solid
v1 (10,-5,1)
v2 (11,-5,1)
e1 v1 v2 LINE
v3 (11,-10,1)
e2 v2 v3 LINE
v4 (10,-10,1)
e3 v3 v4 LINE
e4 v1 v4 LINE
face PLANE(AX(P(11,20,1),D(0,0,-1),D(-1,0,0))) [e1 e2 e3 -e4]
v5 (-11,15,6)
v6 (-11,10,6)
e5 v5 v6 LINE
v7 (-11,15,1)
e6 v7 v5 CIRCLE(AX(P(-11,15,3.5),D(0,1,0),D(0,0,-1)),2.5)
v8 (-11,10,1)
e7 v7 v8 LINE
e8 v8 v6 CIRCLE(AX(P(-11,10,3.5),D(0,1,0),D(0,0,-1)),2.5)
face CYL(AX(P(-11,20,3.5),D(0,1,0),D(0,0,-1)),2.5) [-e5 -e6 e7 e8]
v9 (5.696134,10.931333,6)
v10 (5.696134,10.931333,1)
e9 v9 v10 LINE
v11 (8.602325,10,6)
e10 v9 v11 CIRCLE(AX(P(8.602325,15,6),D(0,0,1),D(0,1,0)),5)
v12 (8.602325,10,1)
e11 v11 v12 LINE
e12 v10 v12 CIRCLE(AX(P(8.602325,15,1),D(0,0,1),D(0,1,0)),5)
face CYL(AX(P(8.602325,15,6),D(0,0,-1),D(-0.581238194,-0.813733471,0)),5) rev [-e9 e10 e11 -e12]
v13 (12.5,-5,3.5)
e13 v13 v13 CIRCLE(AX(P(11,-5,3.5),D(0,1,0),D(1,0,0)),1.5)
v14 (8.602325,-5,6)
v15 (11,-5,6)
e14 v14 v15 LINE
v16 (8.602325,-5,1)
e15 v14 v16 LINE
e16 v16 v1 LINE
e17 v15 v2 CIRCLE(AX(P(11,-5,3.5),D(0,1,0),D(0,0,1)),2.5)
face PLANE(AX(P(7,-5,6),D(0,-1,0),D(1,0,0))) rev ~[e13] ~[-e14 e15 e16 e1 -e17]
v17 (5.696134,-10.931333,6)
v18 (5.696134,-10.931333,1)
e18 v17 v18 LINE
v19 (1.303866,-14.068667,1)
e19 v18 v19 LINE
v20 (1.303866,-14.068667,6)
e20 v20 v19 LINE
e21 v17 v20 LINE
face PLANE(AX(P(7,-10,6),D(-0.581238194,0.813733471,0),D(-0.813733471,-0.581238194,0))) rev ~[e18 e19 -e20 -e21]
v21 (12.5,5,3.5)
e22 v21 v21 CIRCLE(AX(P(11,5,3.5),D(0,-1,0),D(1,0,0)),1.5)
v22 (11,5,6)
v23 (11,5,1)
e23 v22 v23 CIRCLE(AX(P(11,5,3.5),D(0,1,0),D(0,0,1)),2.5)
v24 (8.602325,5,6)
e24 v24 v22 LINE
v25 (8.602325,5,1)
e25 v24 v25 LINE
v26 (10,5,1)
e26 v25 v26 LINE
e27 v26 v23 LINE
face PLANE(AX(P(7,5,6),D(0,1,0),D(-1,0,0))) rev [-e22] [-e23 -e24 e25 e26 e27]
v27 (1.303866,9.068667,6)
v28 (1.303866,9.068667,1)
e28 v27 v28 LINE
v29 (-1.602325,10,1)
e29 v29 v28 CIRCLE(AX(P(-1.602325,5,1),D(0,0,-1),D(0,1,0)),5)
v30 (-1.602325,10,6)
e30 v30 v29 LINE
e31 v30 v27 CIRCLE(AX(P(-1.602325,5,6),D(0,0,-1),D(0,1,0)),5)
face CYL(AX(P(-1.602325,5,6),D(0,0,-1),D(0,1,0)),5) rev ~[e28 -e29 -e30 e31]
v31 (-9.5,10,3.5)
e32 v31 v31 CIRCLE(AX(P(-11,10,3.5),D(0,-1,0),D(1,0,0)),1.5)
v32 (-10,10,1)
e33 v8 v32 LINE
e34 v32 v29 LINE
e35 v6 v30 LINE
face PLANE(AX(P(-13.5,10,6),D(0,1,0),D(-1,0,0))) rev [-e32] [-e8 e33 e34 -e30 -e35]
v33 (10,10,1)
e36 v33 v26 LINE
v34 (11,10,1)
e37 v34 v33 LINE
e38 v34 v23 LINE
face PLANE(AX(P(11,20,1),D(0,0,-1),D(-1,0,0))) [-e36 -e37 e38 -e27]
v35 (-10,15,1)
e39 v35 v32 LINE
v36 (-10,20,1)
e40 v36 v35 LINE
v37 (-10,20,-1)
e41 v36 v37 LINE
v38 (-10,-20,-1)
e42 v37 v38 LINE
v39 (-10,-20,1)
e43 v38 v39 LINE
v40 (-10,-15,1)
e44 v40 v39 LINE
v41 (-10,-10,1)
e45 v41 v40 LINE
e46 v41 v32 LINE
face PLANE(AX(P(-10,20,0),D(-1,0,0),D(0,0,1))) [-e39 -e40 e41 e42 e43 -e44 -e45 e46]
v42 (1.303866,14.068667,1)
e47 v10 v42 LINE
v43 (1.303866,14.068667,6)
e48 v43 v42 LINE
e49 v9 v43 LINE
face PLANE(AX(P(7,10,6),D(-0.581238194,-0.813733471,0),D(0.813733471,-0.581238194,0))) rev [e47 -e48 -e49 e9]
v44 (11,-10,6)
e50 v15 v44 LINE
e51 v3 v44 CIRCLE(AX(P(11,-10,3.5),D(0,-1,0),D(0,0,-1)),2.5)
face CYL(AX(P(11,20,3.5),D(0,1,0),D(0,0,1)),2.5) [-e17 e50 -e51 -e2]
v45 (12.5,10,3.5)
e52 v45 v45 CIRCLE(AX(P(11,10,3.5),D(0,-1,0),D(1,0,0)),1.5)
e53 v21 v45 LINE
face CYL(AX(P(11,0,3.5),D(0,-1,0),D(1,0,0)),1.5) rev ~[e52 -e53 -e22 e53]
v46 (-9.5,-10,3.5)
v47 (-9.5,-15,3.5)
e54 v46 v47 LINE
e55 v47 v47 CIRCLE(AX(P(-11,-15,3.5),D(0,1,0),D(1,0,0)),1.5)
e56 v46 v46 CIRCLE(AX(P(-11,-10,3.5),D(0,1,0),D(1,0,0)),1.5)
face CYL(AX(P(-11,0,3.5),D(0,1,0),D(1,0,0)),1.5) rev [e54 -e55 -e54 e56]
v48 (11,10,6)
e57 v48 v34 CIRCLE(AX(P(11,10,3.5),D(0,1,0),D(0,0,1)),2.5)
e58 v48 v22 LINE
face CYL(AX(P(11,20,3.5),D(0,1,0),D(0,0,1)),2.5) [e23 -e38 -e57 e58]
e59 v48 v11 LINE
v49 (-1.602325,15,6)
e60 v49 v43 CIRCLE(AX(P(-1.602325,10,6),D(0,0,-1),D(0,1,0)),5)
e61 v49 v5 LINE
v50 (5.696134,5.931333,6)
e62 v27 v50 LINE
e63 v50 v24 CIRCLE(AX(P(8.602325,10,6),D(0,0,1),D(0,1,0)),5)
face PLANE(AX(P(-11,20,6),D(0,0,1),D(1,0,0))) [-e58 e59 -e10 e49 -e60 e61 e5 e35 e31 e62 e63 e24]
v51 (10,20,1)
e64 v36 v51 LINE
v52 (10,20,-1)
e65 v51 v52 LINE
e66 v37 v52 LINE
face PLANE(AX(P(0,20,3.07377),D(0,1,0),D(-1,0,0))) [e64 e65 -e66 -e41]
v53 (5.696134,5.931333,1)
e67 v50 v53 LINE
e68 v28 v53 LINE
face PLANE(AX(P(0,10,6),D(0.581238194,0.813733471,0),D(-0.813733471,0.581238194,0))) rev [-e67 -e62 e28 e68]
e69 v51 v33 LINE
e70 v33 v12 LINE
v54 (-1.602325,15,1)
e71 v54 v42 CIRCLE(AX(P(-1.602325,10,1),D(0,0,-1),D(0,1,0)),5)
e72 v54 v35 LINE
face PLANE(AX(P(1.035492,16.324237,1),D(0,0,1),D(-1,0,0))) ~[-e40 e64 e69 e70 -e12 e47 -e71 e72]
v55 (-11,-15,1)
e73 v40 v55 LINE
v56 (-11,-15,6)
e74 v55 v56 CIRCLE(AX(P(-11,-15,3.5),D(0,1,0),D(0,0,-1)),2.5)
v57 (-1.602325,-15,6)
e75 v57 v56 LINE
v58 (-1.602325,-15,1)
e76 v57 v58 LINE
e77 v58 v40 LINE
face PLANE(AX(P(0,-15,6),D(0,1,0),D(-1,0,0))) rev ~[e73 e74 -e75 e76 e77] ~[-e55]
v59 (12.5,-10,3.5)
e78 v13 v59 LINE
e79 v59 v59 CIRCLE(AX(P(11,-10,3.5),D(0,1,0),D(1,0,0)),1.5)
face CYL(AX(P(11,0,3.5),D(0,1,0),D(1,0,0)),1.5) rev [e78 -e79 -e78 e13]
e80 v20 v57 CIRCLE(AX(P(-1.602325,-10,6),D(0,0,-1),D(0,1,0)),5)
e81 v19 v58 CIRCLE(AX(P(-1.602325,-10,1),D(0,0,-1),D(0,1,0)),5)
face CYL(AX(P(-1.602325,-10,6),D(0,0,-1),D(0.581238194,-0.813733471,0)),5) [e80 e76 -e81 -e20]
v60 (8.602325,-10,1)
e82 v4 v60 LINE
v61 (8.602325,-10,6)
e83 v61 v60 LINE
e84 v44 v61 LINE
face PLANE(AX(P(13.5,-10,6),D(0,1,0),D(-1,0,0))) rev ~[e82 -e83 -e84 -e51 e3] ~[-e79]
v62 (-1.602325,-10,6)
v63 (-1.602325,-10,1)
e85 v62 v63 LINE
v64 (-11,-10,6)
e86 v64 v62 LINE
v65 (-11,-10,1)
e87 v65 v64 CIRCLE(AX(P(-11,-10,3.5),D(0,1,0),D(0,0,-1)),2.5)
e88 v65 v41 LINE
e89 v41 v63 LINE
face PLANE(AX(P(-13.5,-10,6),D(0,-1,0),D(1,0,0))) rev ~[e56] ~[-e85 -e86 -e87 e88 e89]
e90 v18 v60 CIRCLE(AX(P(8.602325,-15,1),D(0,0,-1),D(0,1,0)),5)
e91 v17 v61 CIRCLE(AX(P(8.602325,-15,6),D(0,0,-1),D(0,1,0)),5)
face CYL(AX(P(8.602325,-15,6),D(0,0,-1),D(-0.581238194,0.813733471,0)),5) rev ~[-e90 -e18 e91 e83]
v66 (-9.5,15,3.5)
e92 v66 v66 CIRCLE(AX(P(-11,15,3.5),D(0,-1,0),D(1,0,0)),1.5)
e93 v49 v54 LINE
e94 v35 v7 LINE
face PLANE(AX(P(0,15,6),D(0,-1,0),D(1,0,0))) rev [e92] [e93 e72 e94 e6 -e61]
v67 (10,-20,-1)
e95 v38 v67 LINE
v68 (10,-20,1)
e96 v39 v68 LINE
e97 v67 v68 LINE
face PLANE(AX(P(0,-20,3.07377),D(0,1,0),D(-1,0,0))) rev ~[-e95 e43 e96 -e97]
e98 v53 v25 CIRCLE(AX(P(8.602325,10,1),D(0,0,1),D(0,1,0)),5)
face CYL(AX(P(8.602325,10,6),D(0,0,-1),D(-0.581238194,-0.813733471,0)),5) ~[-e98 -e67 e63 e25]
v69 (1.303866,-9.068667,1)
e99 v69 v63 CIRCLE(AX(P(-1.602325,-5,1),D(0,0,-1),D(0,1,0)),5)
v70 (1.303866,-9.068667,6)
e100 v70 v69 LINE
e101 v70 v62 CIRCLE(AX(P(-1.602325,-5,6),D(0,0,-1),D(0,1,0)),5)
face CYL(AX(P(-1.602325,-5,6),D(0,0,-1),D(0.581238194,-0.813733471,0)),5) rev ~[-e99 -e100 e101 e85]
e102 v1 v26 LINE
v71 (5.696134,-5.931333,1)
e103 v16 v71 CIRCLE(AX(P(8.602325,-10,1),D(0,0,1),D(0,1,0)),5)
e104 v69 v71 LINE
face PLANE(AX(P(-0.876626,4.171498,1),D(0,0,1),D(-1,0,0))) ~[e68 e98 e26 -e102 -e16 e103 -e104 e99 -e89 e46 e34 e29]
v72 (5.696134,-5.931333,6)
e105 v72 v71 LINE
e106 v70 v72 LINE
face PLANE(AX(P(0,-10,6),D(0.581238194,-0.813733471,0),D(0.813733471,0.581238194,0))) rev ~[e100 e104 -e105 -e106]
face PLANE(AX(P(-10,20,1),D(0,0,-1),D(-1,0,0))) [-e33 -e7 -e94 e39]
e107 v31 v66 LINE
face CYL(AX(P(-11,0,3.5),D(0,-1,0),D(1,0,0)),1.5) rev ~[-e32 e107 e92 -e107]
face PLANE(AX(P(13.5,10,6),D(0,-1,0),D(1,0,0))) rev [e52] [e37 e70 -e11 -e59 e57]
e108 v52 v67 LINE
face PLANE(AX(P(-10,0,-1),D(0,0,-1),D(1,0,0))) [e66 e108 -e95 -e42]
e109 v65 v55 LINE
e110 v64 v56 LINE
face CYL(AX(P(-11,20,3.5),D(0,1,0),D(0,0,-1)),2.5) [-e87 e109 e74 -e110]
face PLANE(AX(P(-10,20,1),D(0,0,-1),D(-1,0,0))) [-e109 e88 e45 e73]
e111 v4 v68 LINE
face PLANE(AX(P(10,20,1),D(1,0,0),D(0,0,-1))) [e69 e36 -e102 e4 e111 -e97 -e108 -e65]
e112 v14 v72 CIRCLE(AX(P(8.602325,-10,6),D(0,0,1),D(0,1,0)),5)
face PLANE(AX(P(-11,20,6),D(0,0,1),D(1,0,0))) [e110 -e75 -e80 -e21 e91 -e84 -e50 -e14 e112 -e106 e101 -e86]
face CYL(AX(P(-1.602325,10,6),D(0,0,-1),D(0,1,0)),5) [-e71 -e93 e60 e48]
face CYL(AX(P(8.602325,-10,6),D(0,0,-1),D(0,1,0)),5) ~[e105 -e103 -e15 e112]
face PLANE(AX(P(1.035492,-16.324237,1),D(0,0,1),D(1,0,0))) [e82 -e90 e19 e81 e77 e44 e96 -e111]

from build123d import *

# Parameters (mm, degrees)
F0_W          = 20
F0_H          = 1
F1_DEPTH      = 20
F1_DEPTH_BACK = 20
F3_DEPTH      = 40
F5_DEPTH      = 5
F7_R          = 1.5
F8_DEPTH      = 20.001
F8_DEPTH_BACK = 20.001
F9_R          = 5


# Not quite as in the source:
# - a pattern or mirror of a feature is missing from the dataset's text; its kind, count and spacing are read off the source's solid


with BuildPart() as f1:
    # F0 (on Front) → F1 (new body, two sides)
    with BuildSketch(Plane.XZ) as f1_sk:
        with Locations((0, -0.5)):
            Rectangle(F0_W, F0_H)
    extrude(amount=F1_DEPTH)
    extrude(f1_sk.sketch, amount=-F1_DEPTH_BACK)

    # F2 (on face) → F3 (join, through all)
    with BuildSketch(Plane(origin=(0, 20, 0), x_dir=(-1, 0, 0), z_dir=(0, 1, 0))):
        with BuildLine():
            Line((10, 1), (11, 1))
            ThreePointArc((11, 1), (13.5, 3.5), (11, 6))
            Line((11, 6), (0, 6))
            Line((0, 6), (-11, 6))
            ThreePointArc((-11, 6), (-13.5, 3.5), (-11, 1))
            Line((-11, 1), (-10, 1))
            Line((-10, 1), (-10, 0))
            Line((-10, 0), (0, 0))
            Line((0, 0), (10, 0))
            Line((10, 0), (10, 1))
        make_face()
    extrude(amount=-F3_DEPTH)

    # F4 (on face) → F5 (cut, through all)
    with BuildSketch(Plane.XY.offset(6)):
        Polygon((0, -15), (-13.5, -15), (-13.5, -20), (13.5, -20), (13.5, -10), (7, -10), align=None)
        Polygon((-13.5, 0), (-13.5, -10), (0, -10), (7, -5), (13.5, -5), (13.5, 0), align=None)
    f5 = extrude(amount=-F5_DEPTH, mode=Mode.SUBTRACT)

    # F5_copies: F5 across plane
    add(f5.mirror(Plane.ZX), mode=Mode.SUBTRACT)

    # F7 (on offset) → F8 (cut, two sides)
    with BuildSketch(Plane.XZ) as f8_sk:
        with Locations((11, 3.5)):
            Circle(F7_R)
        with Locations((-11, 3.5)):
            Circle(F7_R)
    extrude(amount=-F8_DEPTH, mode=Mode.SUBTRACT)
    extrude(f8_sk.sketch, amount=F8_DEPTH_BACK, mode=Mode.SUBTRACT)

    # F9
    f9_edges = [f1.edges().sort_by_distance(p)[0] for p in [
        (0, -15, 3.5),
        (0, -10, 3.5),
        (7, -5, 3.5),
        (7, -10, 3.5),
        (7, 10, 3.5),
        (0, 15, 3.5),
        (0, 10, 3.5),
        (7, 5, 3.5),
    ]]
    fillet(f9_edges, radius=F9_R)


solid = f1.part
